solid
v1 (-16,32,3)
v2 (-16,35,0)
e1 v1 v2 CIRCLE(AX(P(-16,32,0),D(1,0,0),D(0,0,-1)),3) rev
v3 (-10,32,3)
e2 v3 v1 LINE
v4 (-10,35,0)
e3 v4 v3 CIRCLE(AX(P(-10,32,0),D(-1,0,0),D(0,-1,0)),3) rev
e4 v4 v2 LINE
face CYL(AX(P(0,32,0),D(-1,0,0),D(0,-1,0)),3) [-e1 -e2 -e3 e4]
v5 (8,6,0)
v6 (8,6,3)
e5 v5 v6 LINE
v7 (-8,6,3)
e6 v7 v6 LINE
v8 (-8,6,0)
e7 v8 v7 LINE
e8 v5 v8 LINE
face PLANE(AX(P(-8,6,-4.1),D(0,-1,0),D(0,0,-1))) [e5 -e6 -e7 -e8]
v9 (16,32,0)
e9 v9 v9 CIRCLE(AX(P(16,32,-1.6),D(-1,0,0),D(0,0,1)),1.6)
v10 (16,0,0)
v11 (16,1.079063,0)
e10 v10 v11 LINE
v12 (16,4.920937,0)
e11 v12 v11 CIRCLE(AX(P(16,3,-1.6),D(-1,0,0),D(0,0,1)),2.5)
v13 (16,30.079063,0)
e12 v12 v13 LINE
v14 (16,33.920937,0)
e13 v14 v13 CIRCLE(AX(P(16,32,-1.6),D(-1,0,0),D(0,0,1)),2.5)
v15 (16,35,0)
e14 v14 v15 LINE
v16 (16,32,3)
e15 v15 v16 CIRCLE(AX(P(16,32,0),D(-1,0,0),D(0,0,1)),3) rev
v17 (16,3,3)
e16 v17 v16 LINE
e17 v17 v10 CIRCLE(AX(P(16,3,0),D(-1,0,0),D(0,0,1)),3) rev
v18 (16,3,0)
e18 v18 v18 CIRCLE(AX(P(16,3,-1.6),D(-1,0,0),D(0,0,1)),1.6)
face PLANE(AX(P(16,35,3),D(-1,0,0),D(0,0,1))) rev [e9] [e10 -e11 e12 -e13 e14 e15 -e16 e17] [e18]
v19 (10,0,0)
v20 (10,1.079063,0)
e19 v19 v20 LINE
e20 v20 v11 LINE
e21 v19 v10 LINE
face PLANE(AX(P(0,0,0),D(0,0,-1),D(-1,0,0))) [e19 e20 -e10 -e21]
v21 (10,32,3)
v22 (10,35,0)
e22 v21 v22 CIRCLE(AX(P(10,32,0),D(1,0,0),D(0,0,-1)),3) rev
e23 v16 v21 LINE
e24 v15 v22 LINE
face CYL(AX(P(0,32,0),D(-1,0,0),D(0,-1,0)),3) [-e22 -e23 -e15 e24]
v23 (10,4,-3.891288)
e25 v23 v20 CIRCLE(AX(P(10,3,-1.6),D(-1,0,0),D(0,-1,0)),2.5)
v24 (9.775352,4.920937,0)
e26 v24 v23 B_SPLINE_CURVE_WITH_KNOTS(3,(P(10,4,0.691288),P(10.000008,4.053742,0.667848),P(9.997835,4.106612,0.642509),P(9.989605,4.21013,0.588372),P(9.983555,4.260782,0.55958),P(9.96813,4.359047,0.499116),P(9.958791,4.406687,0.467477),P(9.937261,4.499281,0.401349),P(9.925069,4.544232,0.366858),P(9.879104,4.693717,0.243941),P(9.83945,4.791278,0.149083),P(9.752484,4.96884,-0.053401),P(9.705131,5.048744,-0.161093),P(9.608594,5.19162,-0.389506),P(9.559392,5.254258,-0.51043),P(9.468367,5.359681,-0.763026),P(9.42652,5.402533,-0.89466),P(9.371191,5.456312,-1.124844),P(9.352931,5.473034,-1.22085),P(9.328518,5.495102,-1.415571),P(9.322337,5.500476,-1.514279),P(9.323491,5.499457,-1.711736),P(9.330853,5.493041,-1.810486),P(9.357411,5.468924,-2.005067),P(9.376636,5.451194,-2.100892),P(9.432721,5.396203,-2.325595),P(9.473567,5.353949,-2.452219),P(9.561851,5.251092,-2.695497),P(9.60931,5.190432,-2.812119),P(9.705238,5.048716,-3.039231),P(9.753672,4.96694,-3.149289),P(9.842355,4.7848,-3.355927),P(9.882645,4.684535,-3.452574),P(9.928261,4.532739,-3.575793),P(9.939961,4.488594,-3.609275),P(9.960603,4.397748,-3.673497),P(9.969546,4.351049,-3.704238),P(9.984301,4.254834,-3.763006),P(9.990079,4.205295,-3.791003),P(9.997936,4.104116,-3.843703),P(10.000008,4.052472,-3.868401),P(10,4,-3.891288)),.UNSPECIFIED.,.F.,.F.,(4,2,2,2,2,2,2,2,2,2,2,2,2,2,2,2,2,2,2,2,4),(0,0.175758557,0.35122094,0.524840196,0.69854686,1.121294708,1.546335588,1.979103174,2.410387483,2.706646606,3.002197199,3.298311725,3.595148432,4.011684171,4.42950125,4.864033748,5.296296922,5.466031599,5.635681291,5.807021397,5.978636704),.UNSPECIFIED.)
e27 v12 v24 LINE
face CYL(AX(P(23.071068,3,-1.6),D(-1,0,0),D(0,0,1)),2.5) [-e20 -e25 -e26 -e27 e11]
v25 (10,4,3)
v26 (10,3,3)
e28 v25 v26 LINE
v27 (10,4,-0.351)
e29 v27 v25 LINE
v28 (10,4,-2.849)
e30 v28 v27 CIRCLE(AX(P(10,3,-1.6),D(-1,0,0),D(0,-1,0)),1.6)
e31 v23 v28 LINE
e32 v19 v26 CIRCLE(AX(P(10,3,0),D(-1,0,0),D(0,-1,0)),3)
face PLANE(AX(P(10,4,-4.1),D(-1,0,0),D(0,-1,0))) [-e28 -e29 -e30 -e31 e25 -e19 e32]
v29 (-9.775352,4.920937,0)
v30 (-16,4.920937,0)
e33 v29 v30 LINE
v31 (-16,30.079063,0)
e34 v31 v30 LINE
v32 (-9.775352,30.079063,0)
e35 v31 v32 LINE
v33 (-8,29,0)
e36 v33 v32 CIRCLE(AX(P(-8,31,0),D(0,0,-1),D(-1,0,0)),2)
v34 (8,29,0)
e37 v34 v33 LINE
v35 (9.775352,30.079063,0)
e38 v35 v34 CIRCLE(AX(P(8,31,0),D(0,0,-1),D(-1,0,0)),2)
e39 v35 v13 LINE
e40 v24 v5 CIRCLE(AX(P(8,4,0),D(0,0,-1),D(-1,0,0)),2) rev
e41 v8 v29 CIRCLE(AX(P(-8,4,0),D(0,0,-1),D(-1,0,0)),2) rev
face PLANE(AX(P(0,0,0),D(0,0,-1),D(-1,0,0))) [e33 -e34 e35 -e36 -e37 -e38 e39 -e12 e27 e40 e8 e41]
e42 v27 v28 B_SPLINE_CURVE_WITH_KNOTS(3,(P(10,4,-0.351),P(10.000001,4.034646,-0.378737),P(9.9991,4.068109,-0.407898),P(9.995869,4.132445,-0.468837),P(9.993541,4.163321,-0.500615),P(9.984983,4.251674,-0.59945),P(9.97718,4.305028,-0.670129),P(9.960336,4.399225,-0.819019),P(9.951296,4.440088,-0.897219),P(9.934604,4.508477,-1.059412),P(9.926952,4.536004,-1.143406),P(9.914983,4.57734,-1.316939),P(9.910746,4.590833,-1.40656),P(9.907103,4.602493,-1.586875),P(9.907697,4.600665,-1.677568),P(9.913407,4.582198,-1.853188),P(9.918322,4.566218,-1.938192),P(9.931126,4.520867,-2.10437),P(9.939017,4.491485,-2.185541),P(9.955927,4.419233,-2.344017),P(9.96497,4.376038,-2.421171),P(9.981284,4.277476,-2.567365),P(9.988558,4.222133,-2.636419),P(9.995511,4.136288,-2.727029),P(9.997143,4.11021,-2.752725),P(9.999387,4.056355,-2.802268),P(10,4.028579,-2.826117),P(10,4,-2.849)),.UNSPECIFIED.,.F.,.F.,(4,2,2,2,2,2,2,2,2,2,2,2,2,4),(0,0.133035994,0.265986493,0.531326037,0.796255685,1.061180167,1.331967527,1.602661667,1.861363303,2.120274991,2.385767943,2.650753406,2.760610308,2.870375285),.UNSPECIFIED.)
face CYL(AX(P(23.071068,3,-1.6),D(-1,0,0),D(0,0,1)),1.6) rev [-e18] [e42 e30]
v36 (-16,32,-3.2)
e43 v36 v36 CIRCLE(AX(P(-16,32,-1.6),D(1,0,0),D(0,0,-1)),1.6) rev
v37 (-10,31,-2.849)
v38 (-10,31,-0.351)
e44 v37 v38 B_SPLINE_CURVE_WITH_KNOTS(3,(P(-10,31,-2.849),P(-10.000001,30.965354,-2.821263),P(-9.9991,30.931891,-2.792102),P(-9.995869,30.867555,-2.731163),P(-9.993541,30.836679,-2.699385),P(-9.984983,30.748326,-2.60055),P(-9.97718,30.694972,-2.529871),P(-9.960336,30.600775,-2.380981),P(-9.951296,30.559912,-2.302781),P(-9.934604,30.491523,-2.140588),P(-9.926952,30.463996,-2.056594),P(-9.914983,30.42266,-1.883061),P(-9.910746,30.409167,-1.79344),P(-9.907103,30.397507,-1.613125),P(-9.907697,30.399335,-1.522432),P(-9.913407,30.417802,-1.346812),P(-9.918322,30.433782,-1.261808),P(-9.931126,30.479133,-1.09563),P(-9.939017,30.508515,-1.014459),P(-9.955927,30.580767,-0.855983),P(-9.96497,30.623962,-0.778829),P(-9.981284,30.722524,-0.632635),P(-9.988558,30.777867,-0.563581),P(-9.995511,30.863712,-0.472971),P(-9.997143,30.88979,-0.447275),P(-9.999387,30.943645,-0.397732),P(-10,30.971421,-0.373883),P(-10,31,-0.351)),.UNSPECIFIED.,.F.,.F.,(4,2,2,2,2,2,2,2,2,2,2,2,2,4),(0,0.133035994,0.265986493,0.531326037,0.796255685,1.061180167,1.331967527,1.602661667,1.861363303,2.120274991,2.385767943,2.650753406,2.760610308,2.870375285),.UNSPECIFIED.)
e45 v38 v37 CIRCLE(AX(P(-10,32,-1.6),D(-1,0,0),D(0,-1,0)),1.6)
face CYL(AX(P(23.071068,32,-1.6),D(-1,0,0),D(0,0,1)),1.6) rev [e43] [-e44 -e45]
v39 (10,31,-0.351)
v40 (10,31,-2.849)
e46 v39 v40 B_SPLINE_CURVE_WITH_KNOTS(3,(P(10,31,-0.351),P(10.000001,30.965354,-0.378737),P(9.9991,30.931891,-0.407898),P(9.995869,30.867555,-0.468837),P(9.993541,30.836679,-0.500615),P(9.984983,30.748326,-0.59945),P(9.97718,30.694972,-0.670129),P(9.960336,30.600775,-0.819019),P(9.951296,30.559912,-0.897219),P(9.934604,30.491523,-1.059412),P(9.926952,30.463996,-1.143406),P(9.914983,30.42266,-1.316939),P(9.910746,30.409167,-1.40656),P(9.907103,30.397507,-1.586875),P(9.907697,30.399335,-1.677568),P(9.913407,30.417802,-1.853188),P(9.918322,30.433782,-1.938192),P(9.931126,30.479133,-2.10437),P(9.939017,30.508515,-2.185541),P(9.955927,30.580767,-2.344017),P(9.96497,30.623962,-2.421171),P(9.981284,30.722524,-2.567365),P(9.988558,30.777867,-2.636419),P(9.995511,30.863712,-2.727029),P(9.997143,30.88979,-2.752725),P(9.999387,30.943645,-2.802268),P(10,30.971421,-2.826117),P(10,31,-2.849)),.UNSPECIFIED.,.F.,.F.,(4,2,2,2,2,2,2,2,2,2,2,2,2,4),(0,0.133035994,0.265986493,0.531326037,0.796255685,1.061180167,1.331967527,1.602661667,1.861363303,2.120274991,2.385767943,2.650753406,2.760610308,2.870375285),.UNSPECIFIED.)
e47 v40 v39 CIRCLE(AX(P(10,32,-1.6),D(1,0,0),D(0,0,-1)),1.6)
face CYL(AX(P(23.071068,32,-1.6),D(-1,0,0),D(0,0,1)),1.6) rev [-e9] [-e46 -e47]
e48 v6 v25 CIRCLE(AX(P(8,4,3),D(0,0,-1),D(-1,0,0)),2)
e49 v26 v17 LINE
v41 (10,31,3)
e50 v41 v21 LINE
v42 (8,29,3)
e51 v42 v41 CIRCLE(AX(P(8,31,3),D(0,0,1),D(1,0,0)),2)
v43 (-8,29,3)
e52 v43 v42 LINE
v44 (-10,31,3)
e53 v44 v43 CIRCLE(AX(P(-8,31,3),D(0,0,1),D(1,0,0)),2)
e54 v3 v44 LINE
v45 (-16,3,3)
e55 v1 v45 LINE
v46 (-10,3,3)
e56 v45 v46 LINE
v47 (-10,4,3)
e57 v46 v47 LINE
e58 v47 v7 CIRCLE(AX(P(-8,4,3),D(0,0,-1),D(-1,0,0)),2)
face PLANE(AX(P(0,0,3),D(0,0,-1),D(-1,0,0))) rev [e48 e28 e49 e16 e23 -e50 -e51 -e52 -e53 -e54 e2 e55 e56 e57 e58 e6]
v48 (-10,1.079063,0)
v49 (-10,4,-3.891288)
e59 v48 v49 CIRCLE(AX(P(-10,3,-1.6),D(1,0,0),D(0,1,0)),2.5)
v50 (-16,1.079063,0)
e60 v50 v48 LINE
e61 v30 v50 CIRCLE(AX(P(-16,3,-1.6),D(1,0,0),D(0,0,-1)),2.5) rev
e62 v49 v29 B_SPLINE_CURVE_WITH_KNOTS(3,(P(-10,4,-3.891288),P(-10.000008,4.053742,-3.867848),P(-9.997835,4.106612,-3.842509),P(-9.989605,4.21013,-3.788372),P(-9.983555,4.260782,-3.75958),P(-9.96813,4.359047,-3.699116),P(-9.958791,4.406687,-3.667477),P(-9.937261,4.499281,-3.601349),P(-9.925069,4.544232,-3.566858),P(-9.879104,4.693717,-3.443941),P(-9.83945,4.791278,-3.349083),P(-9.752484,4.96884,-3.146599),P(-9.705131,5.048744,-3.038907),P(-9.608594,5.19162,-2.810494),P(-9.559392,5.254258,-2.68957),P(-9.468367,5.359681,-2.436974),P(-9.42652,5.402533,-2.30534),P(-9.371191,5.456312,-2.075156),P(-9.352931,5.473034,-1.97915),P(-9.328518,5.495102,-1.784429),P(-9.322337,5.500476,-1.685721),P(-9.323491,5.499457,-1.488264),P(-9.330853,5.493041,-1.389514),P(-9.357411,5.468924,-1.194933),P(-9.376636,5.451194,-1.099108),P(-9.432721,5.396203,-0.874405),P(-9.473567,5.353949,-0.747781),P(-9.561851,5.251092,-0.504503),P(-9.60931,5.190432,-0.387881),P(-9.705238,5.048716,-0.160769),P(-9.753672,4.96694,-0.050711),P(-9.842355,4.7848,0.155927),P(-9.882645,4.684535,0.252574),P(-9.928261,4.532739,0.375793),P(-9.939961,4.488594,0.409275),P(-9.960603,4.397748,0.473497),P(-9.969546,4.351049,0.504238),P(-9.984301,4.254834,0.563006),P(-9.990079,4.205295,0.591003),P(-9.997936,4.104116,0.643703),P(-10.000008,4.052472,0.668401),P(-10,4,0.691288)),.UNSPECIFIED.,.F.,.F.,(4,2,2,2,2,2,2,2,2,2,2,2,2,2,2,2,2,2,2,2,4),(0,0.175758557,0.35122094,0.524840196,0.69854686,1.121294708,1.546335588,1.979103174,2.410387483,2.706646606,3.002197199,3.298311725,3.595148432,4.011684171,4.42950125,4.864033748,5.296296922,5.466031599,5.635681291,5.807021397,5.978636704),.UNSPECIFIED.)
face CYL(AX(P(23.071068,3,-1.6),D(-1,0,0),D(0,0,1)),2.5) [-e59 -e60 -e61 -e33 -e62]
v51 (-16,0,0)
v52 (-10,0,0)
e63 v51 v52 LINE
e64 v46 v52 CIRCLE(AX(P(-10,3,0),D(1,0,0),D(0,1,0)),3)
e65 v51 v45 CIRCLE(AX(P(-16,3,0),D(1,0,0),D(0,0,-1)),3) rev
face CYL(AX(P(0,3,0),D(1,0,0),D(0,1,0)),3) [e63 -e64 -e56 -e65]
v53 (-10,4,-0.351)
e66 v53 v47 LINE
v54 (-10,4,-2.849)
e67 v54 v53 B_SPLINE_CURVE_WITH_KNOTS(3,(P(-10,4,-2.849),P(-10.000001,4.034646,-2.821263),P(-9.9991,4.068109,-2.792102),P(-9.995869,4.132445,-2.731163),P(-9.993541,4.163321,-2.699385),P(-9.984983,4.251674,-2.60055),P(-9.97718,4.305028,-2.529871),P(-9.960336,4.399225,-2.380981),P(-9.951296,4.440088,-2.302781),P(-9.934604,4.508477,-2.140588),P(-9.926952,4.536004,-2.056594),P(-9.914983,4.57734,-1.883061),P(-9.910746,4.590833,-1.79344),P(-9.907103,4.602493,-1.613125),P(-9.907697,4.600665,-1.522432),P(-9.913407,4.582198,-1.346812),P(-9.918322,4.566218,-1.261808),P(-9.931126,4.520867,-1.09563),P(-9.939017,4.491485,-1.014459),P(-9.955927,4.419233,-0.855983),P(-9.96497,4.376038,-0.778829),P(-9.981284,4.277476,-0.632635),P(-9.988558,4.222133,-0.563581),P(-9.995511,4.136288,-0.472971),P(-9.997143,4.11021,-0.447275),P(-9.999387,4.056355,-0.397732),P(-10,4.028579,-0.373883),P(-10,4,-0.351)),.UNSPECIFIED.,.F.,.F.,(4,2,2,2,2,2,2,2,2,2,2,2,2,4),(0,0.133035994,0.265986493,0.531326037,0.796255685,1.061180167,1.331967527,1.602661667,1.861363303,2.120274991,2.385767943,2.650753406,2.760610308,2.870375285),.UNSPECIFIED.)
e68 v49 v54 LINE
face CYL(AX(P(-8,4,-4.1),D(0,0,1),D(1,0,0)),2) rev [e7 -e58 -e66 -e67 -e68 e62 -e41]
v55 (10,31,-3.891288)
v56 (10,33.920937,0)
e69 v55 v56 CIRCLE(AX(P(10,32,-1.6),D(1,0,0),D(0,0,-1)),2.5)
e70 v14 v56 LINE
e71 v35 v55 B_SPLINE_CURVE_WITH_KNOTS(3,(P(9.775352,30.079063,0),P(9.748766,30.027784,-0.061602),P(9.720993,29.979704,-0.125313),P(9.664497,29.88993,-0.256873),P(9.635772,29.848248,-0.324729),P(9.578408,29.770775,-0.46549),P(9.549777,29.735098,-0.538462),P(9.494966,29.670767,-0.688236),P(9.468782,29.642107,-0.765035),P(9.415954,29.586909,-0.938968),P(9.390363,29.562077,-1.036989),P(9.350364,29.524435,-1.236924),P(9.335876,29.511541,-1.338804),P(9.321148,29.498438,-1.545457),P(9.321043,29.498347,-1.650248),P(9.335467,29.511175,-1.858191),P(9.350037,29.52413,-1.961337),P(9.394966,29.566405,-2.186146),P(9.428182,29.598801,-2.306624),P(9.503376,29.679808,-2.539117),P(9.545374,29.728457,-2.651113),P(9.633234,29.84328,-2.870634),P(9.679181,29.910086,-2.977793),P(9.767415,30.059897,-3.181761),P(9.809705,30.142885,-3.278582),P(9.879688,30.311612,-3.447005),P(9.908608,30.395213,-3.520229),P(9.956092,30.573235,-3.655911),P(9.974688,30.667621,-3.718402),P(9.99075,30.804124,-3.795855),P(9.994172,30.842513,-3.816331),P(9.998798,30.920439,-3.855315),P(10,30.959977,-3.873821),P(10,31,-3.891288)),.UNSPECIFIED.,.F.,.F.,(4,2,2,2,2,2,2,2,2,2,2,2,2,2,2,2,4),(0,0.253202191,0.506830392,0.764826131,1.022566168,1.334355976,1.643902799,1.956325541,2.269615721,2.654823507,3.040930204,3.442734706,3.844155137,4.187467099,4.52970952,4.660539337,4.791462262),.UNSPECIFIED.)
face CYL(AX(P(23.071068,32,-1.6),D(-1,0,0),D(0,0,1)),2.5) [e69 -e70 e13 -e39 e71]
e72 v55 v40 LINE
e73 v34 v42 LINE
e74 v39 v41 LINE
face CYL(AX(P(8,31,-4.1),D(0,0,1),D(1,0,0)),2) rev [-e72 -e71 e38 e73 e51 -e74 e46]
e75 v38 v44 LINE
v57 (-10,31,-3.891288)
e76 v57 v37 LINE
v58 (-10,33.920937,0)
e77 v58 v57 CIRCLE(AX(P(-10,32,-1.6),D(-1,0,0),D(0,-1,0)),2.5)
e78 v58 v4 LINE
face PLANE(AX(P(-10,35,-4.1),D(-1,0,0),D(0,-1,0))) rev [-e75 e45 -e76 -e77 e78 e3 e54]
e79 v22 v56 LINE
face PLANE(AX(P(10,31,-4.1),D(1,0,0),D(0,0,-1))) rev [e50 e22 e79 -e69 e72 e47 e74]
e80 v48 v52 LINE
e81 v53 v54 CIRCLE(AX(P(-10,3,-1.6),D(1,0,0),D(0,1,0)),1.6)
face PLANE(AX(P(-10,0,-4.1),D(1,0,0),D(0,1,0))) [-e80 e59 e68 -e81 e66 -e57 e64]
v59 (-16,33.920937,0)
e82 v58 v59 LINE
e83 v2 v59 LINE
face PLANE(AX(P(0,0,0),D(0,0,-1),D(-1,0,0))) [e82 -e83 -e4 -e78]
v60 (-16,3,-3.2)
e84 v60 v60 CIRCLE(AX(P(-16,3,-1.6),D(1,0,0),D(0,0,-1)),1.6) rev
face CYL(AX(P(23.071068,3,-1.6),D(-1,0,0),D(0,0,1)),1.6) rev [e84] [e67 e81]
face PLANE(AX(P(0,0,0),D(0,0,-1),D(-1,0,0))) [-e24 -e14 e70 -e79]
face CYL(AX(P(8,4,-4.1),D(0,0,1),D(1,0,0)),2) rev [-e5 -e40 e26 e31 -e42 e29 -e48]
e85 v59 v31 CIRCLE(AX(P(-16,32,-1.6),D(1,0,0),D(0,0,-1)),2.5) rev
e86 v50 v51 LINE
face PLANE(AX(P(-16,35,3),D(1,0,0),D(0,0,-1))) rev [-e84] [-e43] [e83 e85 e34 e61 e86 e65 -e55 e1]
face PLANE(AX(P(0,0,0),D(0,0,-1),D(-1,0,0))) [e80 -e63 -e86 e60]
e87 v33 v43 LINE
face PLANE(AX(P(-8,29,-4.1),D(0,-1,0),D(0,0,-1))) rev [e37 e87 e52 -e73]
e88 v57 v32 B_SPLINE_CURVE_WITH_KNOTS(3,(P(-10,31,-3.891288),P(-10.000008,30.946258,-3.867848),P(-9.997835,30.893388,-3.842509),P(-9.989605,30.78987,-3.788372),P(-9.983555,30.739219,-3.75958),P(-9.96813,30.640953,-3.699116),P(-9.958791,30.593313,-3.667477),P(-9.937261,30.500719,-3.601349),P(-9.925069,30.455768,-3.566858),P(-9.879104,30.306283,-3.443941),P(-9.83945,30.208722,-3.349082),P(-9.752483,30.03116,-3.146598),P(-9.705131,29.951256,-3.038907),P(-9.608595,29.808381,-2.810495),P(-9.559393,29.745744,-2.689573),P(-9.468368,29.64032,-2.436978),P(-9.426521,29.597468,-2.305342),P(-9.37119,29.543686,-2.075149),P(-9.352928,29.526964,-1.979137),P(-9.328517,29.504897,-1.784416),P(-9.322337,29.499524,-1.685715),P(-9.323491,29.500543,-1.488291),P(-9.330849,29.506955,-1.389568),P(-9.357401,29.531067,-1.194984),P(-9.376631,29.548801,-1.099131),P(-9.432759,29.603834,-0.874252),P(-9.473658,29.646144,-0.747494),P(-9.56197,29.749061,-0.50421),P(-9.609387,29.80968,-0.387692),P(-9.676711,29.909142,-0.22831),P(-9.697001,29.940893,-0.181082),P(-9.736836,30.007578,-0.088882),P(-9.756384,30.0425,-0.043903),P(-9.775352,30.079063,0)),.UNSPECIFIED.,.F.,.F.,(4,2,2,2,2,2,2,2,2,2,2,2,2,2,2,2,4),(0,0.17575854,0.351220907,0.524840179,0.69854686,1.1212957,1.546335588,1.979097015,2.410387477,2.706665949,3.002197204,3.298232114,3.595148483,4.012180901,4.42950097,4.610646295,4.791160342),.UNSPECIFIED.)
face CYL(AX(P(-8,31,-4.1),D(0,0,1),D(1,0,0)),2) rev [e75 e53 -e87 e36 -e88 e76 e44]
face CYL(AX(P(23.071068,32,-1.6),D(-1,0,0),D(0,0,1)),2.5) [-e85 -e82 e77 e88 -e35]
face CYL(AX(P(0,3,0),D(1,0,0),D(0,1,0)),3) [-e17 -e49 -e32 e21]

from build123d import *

# Parameters (mm, degrees)
SKETCH1_W                       = 32
SKETCH1_H                       = 35
BOSS_EXTRUDE1_DEPTH             = 3
BOSS_EXTRUDE2_REACH             = 40.601
SKETCH4_R                       = 2.5
SKETCH4_R_2                     = 1.6
BOSS_EXTRUDE2_DIRECTION_2_REACH = 40.601
CUT_EXTRUDE1_DEPTH              = 40.133233958
FILLET1_R                       = 3


with BuildPart() as part:
    # Sketch1 → Boss-Extrude1 (new body)
    with BuildSketch(Plane.XY):
        with Locations((0, 17.5)):
            Rectangle(SKETCH1_W, SKETCH1_H)
    extrude(amount=BOSS_EXTRUDE1_DEPTH)

    # Boss-Extrude2: up to this face of the body (flat: up to its plane)
    boss_extrude2_end = Plane(part.part.faces().sort_by_distance((16, 17.5, 1.5))[0])
    # Sketch4 → Boss-Extrude2 (add, up to the picked face)
    with BuildSketch(Plane(origin=(0, 0, 0), x_dir=(0, 0, -1), z_dir=(1, 0, 0)), mode=Mode.PRIVATE) as boss_extrude2_sk1:
        with Locations((1.6, 32)):
            Circle(SKETCH4_R)
        with Locations(Location((1.6, 32, 0), (0, 0, 180))):
            Circle(SKETCH4_R_2, mode=Mode.SUBTRACT)
    boss_extrude2_tool1 = split(extrude(boss_extrude2_sk1.sketch, amount=BOSS_EXTRUDE2_REACH, mode=Mode.PRIVATE), bisect_by=boss_extrude2_end, keep=Keep.BOTH, mode=Mode.PRIVATE)
    # Sketch4 → Boss-Extrude2 (add, up to the picked face)
    with BuildSketch(Plane(origin=(0, 0, 0), x_dir=(0, 0, -1), z_dir=(1, 0, 0)), mode=Mode.PRIVATE) as boss_extrude2_sk2:
        with Locations((1.6, 3)):
            Circle(SKETCH4_R)
        with Locations(Location((1.6, 3, 0), (0, 0, 180))):
            Circle(SKETCH4_R_2, mode=Mode.SUBTRACT)
    boss_extrude2_tool2 = split(extrude(boss_extrude2_sk2.sketch, amount=BOSS_EXTRUDE2_REACH, mode=Mode.PRIVATE), bisect_by=boss_extrude2_end, keep=Keep.BOTH, mode=Mode.PRIVATE)
    add(boss_extrude2_tool1.solids().sort_by(Axis((0, 32, 0.829289), (1, 0, 0)))[0])
    add(boss_extrude2_tool2.solids().sort_by(Axis((0, 3, 0.829289), (1, 0, 0)))[0])

    # Boss-Extrude2 direction 2: up to this face of the body (flat: up to its plane)
    boss_extrude2_direction_2_end = Plane(part.part.faces().sort_by_distance((-16, 17.5, 1.5))[0])
    # Sketch4 → Boss-Extrude2 direction 2 (add, up to the picked face)
    with BuildSketch(Plane(origin=(0, 0, 0), x_dir=(0, 0, -1), z_dir=(1, 0, 0)), mode=Mode.PRIVATE) as boss_extrude2_direction_2_sk1:
        with Locations((1.6, 32)):
            Circle(SKETCH4_R)
        with Locations(Location((1.6, 32, 0), (0, 0, 180))):
            Circle(SKETCH4_R_2, mode=Mode.SUBTRACT)
    boss_extrude2_direction_2_tool1 = split(extrude(boss_extrude2_direction_2_sk1.sketch, amount=-BOSS_EXTRUDE2_DIRECTION_2_REACH, mode=Mode.PRIVATE), bisect_by=boss_extrude2_direction_2_end, keep=Keep.BOTH, mode=Mode.PRIVATE)
    # Sketch4 → Boss-Extrude2 direction 2 (add, up to the picked face)
    with BuildSketch(Plane(origin=(0, 0, 0), x_dir=(0, 0, -1), z_dir=(1, 0, 0)), mode=Mode.PRIVATE) as boss_extrude2_direction_2_sk2:
        with Locations((1.6, 3)):
            Circle(SKETCH4_R)
        with Locations(Location((1.6, 3, 0), (0, 0, 180))):
            Circle(SKETCH4_R_2, mode=Mode.SUBTRACT)
    boss_extrude2_direction_2_tool2 = split(extrude(boss_extrude2_direction_2_sk2.sketch, amount=-BOSS_EXTRUDE2_DIRECTION_2_REACH, mode=Mode.PRIVATE), bisect_by=boss_extrude2_direction_2_end, keep=Keep.BOTH, mode=Mode.PRIVATE)
    add(boss_extrude2_direction_2_tool1.solids().sort_by(Axis((0, 32, 0.829289), (-1, 0, 0)))[0])
    add(boss_extrude2_direction_2_tool2.solids().sort_by(Axis((0, 3, 0.829289), (-1, 0, 0)))[0])

    # Sketch5 → Cut-Extrude1 (cut, through all)
    with BuildSketch(Plane.XY.offset(3)):
        with BuildLine():
            Line((-10, 35), (-10, 31))
            ThreePointArc((-10, 31), (-9.414213562, 29.585786438), (-8, 29))
            Line((-8, 29), (8, 29))
            ThreePointArc((8, 29), (9.414213562, 29.585786438), (10, 31))
            Line((10, 31), (10, 35))
            Line((10, 35), (-10, 35))
        make_face()
        with BuildLine():
            Line((-10, 0), (-10, 4))
            ThreePointArc((-10, 4), (-9.414213562, 5.414213562), (-8, 6))
            Line((-8, 6), (8, 6))
            ThreePointArc((8, 6), (9.414213562, 5.414213562), (10, 4))
            Line((10, 4), (10, 0))
            Line((10, 0), (-10, 0))
        make_face()
    extrude(amount=-CUT_EXTRUDE1_DEPTH, mode=Mode.SUBTRACT)

    # Fillet1
    fillet1_edges = [part.edges().sort_by_distance(p)[0] for p in [
        (13, 0, 3),
        (-13, 0, 3),
        (13, 35, 3),
        (-13, 35, 3),
    ]]
    fillet(fillet1_edges, radius=FILLET1_R - 0.0001)  # a hair under: the kernel refuses the full size


solid = part.part
